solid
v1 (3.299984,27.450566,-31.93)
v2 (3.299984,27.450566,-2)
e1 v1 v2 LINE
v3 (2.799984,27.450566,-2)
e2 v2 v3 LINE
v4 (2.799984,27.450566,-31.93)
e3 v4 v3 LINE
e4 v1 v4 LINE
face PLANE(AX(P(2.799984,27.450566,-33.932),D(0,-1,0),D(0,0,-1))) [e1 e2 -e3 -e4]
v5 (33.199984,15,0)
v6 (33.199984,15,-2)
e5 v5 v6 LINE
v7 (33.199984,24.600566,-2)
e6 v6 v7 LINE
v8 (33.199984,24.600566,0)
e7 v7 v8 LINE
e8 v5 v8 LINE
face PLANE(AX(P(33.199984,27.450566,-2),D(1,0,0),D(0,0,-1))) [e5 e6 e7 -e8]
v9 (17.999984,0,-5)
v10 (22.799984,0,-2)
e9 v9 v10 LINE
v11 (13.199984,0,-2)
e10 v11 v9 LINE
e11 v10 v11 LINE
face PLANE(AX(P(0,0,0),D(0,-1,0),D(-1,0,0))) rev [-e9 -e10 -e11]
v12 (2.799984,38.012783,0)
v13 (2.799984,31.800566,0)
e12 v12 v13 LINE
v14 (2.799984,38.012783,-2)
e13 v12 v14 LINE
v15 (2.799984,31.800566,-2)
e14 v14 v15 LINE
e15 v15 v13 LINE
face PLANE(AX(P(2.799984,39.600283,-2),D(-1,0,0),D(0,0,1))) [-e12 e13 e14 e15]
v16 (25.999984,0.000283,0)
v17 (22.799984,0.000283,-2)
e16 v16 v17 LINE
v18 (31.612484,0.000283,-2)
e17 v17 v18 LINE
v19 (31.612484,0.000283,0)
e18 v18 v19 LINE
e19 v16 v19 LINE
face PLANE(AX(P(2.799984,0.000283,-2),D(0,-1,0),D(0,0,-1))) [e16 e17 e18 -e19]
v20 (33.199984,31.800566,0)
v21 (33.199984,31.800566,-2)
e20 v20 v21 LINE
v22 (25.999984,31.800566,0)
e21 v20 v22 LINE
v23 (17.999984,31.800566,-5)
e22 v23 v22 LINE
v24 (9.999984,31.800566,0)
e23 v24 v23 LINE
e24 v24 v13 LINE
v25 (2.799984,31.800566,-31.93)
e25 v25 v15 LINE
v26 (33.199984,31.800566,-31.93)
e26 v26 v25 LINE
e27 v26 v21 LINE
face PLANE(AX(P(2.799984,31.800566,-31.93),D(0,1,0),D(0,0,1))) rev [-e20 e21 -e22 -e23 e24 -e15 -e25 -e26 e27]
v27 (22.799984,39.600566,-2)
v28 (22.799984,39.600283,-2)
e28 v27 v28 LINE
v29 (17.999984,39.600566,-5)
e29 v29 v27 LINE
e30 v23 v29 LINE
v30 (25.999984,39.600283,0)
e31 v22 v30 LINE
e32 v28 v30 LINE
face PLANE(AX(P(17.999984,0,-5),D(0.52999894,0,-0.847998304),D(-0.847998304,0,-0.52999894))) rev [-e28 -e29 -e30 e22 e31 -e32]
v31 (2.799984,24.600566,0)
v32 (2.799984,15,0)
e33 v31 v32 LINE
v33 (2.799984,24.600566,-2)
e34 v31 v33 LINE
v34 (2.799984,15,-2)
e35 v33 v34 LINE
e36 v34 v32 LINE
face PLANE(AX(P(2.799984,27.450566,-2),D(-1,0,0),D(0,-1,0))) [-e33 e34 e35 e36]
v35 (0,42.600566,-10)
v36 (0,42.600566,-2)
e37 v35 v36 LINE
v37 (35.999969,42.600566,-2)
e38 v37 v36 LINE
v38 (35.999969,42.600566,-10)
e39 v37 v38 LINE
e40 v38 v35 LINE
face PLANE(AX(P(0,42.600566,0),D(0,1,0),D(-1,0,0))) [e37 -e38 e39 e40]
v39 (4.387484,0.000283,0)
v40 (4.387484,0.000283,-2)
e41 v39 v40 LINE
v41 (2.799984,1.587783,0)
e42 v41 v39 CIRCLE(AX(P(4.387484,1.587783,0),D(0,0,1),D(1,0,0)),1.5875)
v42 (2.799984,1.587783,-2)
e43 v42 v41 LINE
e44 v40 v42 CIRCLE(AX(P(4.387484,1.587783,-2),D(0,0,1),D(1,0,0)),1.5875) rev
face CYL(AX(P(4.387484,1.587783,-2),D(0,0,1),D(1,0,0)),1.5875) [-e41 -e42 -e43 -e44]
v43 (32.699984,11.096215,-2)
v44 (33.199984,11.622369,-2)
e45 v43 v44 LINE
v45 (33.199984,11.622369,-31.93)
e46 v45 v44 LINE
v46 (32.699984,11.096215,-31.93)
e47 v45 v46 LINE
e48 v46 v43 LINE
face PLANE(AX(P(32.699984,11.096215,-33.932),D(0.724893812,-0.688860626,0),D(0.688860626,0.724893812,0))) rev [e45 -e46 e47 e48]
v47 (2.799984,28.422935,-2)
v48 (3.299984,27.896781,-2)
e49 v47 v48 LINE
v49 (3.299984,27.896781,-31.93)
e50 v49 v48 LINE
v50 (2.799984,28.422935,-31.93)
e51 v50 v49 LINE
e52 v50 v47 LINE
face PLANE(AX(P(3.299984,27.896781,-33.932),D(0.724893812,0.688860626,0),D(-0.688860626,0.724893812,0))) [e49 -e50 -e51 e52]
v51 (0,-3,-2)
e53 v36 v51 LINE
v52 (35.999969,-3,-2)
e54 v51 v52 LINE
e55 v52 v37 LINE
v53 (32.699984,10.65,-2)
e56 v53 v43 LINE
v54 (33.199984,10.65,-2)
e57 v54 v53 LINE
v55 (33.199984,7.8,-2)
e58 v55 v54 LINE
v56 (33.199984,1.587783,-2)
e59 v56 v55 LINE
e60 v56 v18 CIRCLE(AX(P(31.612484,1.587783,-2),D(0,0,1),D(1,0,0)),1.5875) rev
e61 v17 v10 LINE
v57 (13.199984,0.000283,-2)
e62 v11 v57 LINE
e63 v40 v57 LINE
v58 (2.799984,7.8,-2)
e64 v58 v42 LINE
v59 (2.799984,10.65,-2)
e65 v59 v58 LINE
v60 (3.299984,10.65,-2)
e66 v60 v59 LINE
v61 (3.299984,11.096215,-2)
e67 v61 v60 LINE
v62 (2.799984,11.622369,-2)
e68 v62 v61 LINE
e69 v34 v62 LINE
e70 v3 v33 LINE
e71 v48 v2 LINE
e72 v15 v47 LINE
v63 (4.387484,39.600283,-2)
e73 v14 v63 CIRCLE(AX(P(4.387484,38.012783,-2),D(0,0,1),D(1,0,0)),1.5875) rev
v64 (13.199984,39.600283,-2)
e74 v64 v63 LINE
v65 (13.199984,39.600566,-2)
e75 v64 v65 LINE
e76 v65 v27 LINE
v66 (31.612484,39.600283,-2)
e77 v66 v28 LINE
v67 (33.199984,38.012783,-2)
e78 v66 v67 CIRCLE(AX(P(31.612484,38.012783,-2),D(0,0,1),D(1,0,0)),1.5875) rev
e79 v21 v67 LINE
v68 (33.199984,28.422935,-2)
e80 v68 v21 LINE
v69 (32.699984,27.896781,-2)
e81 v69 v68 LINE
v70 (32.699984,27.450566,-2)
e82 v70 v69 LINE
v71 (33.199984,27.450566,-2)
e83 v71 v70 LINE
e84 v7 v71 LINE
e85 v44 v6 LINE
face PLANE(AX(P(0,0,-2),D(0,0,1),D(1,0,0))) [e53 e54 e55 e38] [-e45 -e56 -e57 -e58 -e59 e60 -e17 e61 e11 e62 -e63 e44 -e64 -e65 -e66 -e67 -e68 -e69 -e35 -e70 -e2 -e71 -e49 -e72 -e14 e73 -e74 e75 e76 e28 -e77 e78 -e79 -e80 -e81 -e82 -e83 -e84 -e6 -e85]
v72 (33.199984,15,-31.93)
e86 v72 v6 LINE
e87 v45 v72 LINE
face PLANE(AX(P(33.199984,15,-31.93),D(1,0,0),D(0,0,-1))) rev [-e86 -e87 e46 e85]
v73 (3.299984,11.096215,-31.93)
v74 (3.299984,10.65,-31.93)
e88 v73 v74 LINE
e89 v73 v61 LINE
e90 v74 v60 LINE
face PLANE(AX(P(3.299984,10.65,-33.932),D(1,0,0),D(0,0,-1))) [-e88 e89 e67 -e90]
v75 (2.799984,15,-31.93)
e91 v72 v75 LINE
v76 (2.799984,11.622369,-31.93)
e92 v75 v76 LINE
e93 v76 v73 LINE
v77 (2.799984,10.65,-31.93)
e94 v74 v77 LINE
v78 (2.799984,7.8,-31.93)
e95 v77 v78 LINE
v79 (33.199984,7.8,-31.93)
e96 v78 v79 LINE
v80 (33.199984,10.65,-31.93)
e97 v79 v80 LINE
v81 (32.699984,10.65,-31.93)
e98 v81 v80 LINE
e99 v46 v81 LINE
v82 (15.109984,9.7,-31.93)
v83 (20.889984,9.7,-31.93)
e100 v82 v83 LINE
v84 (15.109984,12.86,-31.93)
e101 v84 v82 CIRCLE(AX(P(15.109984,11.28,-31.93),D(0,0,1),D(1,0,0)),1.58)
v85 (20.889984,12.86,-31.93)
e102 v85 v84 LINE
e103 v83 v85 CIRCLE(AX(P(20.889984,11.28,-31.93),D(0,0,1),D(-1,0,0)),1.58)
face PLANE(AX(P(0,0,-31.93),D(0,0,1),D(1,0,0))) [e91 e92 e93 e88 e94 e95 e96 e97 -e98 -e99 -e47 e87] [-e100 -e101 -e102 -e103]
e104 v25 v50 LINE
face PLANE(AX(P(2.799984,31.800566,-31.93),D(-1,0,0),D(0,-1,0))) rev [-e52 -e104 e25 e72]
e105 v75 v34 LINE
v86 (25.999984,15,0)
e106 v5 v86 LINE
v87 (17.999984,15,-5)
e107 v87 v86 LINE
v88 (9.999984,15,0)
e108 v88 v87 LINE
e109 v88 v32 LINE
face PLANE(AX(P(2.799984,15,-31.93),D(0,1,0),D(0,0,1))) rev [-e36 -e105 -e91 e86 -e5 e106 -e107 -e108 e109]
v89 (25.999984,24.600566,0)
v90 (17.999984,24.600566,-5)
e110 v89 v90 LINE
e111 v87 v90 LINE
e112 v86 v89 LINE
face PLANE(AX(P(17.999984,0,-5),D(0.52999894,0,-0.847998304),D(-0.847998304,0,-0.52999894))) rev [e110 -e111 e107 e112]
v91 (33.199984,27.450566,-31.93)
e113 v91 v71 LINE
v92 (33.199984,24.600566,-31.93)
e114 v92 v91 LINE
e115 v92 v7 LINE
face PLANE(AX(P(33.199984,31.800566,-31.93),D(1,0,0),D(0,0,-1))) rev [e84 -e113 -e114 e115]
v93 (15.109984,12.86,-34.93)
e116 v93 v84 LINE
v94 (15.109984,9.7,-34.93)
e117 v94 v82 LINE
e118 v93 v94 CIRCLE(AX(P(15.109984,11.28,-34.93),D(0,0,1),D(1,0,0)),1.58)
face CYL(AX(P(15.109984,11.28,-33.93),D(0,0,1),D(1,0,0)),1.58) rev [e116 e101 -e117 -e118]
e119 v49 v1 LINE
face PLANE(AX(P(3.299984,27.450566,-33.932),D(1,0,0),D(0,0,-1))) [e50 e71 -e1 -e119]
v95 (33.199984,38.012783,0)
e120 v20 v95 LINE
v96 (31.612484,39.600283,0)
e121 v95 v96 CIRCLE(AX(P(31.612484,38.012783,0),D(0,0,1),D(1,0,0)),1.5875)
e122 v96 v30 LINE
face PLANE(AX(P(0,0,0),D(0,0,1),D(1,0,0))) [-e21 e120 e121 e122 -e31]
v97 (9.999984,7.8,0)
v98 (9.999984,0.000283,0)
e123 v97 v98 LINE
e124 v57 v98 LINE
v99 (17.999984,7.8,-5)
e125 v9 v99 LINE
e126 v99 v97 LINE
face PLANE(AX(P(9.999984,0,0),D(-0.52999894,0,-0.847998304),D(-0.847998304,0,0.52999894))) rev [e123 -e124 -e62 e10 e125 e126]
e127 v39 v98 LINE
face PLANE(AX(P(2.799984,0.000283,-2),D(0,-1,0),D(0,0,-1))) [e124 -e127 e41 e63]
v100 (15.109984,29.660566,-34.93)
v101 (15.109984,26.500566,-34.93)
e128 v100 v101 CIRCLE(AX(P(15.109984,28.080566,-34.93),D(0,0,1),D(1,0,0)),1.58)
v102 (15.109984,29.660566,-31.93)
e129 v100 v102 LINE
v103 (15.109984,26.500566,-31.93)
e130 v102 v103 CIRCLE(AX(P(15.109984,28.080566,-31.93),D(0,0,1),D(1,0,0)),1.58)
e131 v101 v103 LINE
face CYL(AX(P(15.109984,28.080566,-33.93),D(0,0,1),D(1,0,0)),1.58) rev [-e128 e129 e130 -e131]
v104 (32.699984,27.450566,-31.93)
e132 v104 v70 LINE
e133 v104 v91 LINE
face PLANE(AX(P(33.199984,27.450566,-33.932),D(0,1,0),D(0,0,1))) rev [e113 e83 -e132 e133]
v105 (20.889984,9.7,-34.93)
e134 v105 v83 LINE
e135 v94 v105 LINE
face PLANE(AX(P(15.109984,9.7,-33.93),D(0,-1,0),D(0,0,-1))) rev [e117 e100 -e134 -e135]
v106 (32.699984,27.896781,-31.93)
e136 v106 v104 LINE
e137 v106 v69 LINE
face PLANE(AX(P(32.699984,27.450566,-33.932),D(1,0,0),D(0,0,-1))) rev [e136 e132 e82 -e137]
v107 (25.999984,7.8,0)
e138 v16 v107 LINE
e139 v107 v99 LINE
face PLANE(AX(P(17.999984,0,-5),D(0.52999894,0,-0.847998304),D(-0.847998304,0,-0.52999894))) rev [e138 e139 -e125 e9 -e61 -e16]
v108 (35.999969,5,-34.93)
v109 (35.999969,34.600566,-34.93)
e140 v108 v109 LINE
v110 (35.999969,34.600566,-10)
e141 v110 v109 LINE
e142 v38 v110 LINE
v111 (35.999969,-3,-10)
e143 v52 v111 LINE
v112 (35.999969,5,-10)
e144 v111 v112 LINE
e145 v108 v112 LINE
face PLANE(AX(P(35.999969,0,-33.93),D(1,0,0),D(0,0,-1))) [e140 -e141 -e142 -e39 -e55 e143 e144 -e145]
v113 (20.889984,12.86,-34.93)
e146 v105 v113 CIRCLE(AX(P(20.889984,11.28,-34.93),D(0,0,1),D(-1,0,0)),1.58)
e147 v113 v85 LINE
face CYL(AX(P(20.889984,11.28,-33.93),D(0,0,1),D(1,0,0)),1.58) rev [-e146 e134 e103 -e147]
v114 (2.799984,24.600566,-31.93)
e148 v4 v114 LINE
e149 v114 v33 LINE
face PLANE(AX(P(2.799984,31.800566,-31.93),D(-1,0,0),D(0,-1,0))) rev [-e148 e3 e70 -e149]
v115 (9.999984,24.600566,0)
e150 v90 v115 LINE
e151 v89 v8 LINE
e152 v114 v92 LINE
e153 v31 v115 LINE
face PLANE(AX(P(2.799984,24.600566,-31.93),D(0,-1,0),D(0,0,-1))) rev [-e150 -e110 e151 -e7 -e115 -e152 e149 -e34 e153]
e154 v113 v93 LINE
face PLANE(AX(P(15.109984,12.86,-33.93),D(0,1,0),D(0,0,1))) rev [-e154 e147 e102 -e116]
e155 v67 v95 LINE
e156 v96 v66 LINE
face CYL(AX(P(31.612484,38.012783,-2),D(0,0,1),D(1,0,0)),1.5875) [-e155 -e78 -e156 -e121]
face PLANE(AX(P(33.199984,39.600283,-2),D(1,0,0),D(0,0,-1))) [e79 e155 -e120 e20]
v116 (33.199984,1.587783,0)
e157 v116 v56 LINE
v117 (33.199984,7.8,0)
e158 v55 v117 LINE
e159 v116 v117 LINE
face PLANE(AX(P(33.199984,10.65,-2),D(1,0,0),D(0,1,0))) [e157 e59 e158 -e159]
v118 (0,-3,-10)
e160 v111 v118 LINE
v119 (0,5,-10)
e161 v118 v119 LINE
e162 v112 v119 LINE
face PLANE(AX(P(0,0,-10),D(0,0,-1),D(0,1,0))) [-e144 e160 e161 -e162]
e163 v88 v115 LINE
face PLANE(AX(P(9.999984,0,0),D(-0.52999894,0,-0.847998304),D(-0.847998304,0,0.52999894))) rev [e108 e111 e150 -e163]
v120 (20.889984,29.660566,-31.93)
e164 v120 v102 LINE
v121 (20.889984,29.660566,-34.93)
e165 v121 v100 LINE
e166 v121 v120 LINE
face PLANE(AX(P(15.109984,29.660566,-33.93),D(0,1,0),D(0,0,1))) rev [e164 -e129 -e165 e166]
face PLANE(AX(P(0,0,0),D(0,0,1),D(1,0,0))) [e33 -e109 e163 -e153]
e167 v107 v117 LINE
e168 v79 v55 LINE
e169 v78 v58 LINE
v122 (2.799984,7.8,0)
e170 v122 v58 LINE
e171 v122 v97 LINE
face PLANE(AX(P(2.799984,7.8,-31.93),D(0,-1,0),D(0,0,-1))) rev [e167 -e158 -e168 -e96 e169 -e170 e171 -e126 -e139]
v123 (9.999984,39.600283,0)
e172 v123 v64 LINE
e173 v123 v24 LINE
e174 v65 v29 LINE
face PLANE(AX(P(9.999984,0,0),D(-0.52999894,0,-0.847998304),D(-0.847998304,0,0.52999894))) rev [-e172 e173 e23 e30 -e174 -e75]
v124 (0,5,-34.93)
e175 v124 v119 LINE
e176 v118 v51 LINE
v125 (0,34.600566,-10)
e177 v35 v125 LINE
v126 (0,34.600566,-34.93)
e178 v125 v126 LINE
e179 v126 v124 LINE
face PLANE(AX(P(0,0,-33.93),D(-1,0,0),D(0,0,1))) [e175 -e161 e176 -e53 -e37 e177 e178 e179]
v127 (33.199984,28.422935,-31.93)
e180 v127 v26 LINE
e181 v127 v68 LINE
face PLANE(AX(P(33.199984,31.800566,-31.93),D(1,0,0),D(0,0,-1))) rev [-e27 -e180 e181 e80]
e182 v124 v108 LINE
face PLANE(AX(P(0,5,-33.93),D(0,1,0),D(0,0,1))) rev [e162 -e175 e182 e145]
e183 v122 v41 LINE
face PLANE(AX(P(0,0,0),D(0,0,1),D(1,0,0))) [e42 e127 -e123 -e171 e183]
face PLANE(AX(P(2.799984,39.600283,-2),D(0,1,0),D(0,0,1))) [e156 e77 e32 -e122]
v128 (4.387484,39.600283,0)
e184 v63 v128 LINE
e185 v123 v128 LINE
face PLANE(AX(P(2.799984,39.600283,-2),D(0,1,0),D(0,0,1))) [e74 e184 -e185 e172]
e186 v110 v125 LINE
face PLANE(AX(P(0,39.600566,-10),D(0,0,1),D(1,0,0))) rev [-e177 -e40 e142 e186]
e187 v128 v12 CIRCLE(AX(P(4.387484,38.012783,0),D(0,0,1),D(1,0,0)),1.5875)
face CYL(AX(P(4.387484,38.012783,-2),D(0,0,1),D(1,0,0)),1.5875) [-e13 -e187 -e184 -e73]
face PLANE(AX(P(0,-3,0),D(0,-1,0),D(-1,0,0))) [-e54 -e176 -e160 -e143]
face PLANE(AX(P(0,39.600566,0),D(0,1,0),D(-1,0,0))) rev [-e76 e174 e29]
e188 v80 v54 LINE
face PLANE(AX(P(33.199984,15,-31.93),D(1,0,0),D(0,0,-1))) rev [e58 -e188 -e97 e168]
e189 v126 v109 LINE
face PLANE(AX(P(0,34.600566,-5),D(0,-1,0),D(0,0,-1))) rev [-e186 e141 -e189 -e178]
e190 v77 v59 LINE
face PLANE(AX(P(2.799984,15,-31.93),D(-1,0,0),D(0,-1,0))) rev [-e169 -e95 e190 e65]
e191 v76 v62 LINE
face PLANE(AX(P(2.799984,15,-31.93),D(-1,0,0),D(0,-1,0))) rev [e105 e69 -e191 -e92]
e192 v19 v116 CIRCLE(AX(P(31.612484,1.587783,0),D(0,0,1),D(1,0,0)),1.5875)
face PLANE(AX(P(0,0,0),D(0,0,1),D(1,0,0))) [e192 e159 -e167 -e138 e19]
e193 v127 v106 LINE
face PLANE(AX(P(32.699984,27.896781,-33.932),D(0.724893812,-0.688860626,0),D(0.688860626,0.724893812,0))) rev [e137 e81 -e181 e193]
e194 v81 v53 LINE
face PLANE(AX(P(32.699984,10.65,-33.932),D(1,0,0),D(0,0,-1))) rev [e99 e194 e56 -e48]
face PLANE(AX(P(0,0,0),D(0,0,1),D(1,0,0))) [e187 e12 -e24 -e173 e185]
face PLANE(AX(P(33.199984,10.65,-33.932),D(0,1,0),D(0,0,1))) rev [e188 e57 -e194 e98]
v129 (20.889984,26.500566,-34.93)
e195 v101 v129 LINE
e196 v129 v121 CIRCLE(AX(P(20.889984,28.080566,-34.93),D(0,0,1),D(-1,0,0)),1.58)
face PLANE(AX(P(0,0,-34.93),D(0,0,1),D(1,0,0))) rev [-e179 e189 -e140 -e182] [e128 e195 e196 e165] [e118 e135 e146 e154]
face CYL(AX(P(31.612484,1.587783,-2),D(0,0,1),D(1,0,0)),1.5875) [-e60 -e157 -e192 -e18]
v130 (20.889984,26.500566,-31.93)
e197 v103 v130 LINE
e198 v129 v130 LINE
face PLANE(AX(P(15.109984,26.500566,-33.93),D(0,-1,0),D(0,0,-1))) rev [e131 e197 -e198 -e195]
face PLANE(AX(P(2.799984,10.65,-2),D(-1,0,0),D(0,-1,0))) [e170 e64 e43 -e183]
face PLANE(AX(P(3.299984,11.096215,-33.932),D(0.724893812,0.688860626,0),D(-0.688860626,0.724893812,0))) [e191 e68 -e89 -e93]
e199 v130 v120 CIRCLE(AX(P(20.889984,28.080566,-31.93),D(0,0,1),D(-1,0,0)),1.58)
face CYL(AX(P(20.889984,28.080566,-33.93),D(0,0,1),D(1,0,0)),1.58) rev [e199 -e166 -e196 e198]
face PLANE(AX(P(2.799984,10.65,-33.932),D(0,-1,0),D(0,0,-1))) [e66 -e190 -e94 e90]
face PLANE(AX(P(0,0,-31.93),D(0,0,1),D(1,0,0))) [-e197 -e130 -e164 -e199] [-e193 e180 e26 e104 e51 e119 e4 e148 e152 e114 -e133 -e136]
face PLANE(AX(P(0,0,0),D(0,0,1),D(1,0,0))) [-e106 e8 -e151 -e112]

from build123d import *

# Parameters (mm, degrees)
SKETCH1_W            = 35.999968648
SKETCH1_H            = 39.60056603
BOSS_EXTRUDE1_DEPTH  = 33.93
SKETCH2_W            = 28.93
SKETCH2_H            = 5
CUT_EXTRUDE1_DEPTH   = 64.367558518
SKETCH3_W            = 16
SKETCH3_H            = 5
CUT_EXTRUDE2_DEPTH   = 64.367558518
CUT_EXTRUDE3_DEPTH   = 61.369212453
SKETCH5_W            = 30.4
SKETCH5_H            = 7.2
CUT_EXTRUDE4_DEPTH   = 31.93
CUT_EXTRUDE5_DEPTH   = 63.319559309
BOSS_EXTRUDE2_REACH  = 65.368
BOSS_EXTRUDE3_DEPTH  = 5
SKETCH16_W           = 35.999968648
SKETCH16_H           = 10
BOSS_EXTRUDE8_DEPTH  = 3
SKETCH12_W           = 35.999968648
SKETCH12_H           = 45.60056603
CUT_EXTRUDE6_DEPTH   = 2
FILLET1_R            = 1.5875
MOVE_START           = -34.93
MOVE_FACE1_OUTLINE_W = 35.999968648
MOVE_FACE1_OUTLINE_H = 29.60056603
MOVE_FACE1_DEPTH     = 1


# Read off the part's stored shape, not the designer's step: Move Face1
with BuildPart() as part:
    # Sketch1 → Boss-Extrude1 (new body)
    with BuildSketch(Plane.XY):
        with Locations((17.999984324, 19.800283015)):
            Rectangle(SKETCH1_W, SKETCH1_H)
    extrude(amount=-BOSS_EXTRUDE1_DEPTH)

    # Sketch2 → Cut-Extrude1 (cut, through all)
    with BuildSketch(Plane(origin=(35.999968648, 0, 0), x_dir=(0, 0, -1), z_dir=(1, 0, 0))):
        with Locations((19.465, 37.10056603)):
            Rectangle(SKETCH2_W, SKETCH2_H)
        with Locations((19.465, 2.5)):
            Rectangle(SKETCH2_W, SKETCH2_H)
    extrude(amount=-CUT_EXTRUDE1_DEPTH, mode=Mode.SUBTRACT)

    # Sketch3 → Cut-Extrude2 (cut, through all)
    with BuildSketch(Plane.XY):
        with Locations((17.999984324, 37.10056603)):
            Rectangle(SKETCH3_W, SKETCH3_H)
        with Locations((17.999984324, 2.5)):
            Rectangle(SKETCH3_W, SKETCH3_H)
    extrude(amount=-CUT_EXTRUDE2_DEPTH, mode=Mode.SUBTRACT)

    # Sketch4 → Cut-Extrude3 (cut, through all)
    with BuildSketch(Plane(origin=(0, 34.60056603, 0), x_dir=(1, 0, 0), z_dir=(0, 1, 0))):
        Polygon((9.999984324, 0), (17.999984324, 5), (25.999984324, 0), align=None)
    extrude(amount=-CUT_EXTRUDE3_DEPTH, mode=Mode.SUBTRACT)

    # Sketch5 → Cut-Extrude4 (cut)
    with BuildSketch(Plane.XY):
        with Locations((17.999984324, 11.4)):
            Rectangle(SKETCH5_W, SKETCH5_H)
        with Locations((17.999984324, 28.20056603)):
            Rectangle(SKETCH5_W, SKETCH5_H)
    extrude(amount=-CUT_EXTRUDE4_DEPTH, mode=Mode.SUBTRACT)

    # Sketch6 → Cut-Extrude5 (cut, through all)
    with BuildSketch(Plane.XY.offset(-31.93)):
        with BuildLine():
            Line((15.109984324, 29.66056603), (20.889984324, 29.66056603))
            ThreePointArc((20.889984324, 29.66056603), (22.469984324, 28.08056603), (20.889984324, 26.50056603))
            Line((20.889984324, 26.50056603), (15.109984324, 26.50056603))
            ThreePointArc((15.109984324, 26.50056603), (13.529984324, 28.08056603), (15.109984324, 29.66056603))
        make_face()
        with BuildLine():
            Line((15.109984324, 12.86), (20.889984324, 12.86))
            ThreePointArc((20.889984324, 12.86), (22.469984324, 11.28), (20.889984324, 9.7))
            Line((20.889984324, 9.7), (15.109984324, 9.7))
            ThreePointArc((15.109984324, 9.7), (13.529984324, 11.28), (15.109984324, 12.86))
        make_face()
    extrude(amount=-CUT_EXTRUDE5_DEPTH, mode=Mode.SUBTRACT)

    # Sketch7 → Boss-Extrude2 (add, up to next)
    with BuildSketch(Plane.XY, mode=Mode.PRIVATE) as boss_extrude2_sk1:
        Polygon((2.799984324, 28.422935376), (2.799984324, 27.45056603), (3.299984324, 27.45056603), (3.299984324, 27.896781183), align=None)
    boss_extrude2_tool1 = extrude(boss_extrude2_sk1.sketch, amount=-BOSS_EXTRUDE2_REACH, mode=Mode.PRIVATE) - part.part
    # Sketch7 → Boss-Extrude2 (add, up to next)
    with BuildSketch(Plane.XY, mode=Mode.PRIVATE) as boss_extrude2_sk2:
        Polygon((2.799984324, 11.622369346), (2.799984324, 10.65), (3.299984324, 10.65), (3.299984324, 11.096215154), align=None)
    boss_extrude2_tool2 = extrude(boss_extrude2_sk2.sketch, amount=-BOSS_EXTRUDE2_REACH, mode=Mode.PRIVATE) - part.part
    boss_extrude2_1 = boss_extrude2_tool1.solids().sort_by_distance((3.019076, 27.821475, 0))[0]
    add(boss_extrude2_1)
    boss_extrude2_2 = boss_extrude2_tool2.solids().sort_by_distance((3.019076, 11.020909, 0))[0]
    add(boss_extrude2_2)
    boss_extrude2 = boss_extrude2_1 + boss_extrude2_2  # Boss-Extrude2 as one shape, for the pattern or mirror that repeats it

    # Mirror1: Boss-Extrude2 across plane
    add(boss_extrude2.mirror(Plane(origin=(17.999984324, 0, 0), x_dir=(0, 0, 1), z_dir=(1, 0, 0))))

    # Sketch8 → Boss-Extrude3 (add)
    with BuildSketch(Plane(origin=(0, 34.60056603, 0), x_dir=(1, 0, 0), z_dir=(0, 1, 0))):
        Polygon((9.999984324, 0), (17.999984324, 5), (25.999984324, 0), (35.999968648, 0), (35.999968648, 10), (0, 10), (0, 0), align=None)
    boss_extrude3 = extrude(amount=BOSS_EXTRUDE3_DEPTH)

    # Sketch16 → Boss-Extrude8 (add)
    with BuildSketch(Plane(origin=(0, 39.60056603, 0), x_dir=(1, 0, 0), z_dir=(0, 1, 0))):
        with Locations((17.999984324, 5)):
            Rectangle(SKETCH16_W, SKETCH16_H)
    boss_extrude8 = extrude(amount=BOSS_EXTRUDE8_DEPTH)

    # Mirror2: Boss-Extrude3, Boss-Extrude8 across plane
    add(boss_extrude3.mirror(Plane.ZX.offset(19.800283015)))
    add(boss_extrude8.mirror(Plane.ZX.offset(19.800283015)))

    # Sketch12 → Cut-Extrude6 (cut)
    with BuildSketch(Plane.XY):
        with Locations((17.999984324, 19.800283015)):
            Rectangle(SKETCH12_W, SKETCH12_H)
        Polygon((2.799984324, 39.600283015), (33.199984324, 39.600283015), (33.199984324, 28.422935376), (32.699984324, 27.896781183), (32.699984324, 27.45056603), (33.199984324, 27.45056603), (33.199984324, 11.622369346), (32.699984324, 11.096215154), (32.699984324, 10.65), (33.199984324, 10.65), (33.199984324, 0.000283015), (2.799984324, 0.000283015), (2.799984324, 10.65), (3.299984324, 10.65), (3.299984324, 11.096215154), (2.799984324, 11.622369346), (2.799984324, 27.45056603), (3.299984324, 27.45056603), (3.299984324, 27.896781183), (2.799984324, 28.422935376), align=None, mode=Mode.SUBTRACT)
    extrude(amount=-CUT_EXTRUDE6_DEPTH, mode=Mode.SUBTRACT)

    # Fillet1
    fillet1_edges = [part.edges().sort_by_distance(p)[0] for p in [
        (33.199984324, 39.600283015, -1),
        (2.799984324, 0.000283015, -1),
        (2.799984324, 39.600283015, -1),
        (33.199984324, 0.000283015, -1),
    ]]
    fillet(fillet1_edges, radius=FILLET1_R)

    # Move Face1 outline → Move Face1 (add)
    with BuildSketch(Plane.XY.offset(MOVE_START)):
        with Locations((17.999984324, 19.800283015)):
            Rectangle(MOVE_FACE1_OUTLINE_W, MOVE_FACE1_OUTLINE_H)
        with BuildLine():
            ThreePointArc((15.109984324, 9.7), (13.529984324, 11.28), (15.109984324, 12.86))
            Line((15.109984324, 12.86), (20.889984324, 12.86))
            ThreePointArc((20.889984324, 12.86), (22.469984324, 11.28), (20.889984324, 9.7))
            Line((20.889984324, 9.7), (15.109984324, 9.7))
        make_face(mode=Mode.SUBTRACT)
        with BuildLine():
            ThreePointArc((15.109984324, 26.50056603), (13.529984324, 28.08056603), (15.109984324, 29.66056603))
            Line((15.109984324, 29.66056603), (20.889984324, 29.66056603))
            ThreePointArc((20.889984324, 29.66056603), (22.469984324, 28.08056603), (20.889984324, 26.50056603))
            Line((20.889984324, 26.50056603), (15.109984324, 26.50056603))
        make_face(mode=Mode.SUBTRACT)
    extrude(amount=MOVE_FACE1_DEPTH)


solid = part.part
